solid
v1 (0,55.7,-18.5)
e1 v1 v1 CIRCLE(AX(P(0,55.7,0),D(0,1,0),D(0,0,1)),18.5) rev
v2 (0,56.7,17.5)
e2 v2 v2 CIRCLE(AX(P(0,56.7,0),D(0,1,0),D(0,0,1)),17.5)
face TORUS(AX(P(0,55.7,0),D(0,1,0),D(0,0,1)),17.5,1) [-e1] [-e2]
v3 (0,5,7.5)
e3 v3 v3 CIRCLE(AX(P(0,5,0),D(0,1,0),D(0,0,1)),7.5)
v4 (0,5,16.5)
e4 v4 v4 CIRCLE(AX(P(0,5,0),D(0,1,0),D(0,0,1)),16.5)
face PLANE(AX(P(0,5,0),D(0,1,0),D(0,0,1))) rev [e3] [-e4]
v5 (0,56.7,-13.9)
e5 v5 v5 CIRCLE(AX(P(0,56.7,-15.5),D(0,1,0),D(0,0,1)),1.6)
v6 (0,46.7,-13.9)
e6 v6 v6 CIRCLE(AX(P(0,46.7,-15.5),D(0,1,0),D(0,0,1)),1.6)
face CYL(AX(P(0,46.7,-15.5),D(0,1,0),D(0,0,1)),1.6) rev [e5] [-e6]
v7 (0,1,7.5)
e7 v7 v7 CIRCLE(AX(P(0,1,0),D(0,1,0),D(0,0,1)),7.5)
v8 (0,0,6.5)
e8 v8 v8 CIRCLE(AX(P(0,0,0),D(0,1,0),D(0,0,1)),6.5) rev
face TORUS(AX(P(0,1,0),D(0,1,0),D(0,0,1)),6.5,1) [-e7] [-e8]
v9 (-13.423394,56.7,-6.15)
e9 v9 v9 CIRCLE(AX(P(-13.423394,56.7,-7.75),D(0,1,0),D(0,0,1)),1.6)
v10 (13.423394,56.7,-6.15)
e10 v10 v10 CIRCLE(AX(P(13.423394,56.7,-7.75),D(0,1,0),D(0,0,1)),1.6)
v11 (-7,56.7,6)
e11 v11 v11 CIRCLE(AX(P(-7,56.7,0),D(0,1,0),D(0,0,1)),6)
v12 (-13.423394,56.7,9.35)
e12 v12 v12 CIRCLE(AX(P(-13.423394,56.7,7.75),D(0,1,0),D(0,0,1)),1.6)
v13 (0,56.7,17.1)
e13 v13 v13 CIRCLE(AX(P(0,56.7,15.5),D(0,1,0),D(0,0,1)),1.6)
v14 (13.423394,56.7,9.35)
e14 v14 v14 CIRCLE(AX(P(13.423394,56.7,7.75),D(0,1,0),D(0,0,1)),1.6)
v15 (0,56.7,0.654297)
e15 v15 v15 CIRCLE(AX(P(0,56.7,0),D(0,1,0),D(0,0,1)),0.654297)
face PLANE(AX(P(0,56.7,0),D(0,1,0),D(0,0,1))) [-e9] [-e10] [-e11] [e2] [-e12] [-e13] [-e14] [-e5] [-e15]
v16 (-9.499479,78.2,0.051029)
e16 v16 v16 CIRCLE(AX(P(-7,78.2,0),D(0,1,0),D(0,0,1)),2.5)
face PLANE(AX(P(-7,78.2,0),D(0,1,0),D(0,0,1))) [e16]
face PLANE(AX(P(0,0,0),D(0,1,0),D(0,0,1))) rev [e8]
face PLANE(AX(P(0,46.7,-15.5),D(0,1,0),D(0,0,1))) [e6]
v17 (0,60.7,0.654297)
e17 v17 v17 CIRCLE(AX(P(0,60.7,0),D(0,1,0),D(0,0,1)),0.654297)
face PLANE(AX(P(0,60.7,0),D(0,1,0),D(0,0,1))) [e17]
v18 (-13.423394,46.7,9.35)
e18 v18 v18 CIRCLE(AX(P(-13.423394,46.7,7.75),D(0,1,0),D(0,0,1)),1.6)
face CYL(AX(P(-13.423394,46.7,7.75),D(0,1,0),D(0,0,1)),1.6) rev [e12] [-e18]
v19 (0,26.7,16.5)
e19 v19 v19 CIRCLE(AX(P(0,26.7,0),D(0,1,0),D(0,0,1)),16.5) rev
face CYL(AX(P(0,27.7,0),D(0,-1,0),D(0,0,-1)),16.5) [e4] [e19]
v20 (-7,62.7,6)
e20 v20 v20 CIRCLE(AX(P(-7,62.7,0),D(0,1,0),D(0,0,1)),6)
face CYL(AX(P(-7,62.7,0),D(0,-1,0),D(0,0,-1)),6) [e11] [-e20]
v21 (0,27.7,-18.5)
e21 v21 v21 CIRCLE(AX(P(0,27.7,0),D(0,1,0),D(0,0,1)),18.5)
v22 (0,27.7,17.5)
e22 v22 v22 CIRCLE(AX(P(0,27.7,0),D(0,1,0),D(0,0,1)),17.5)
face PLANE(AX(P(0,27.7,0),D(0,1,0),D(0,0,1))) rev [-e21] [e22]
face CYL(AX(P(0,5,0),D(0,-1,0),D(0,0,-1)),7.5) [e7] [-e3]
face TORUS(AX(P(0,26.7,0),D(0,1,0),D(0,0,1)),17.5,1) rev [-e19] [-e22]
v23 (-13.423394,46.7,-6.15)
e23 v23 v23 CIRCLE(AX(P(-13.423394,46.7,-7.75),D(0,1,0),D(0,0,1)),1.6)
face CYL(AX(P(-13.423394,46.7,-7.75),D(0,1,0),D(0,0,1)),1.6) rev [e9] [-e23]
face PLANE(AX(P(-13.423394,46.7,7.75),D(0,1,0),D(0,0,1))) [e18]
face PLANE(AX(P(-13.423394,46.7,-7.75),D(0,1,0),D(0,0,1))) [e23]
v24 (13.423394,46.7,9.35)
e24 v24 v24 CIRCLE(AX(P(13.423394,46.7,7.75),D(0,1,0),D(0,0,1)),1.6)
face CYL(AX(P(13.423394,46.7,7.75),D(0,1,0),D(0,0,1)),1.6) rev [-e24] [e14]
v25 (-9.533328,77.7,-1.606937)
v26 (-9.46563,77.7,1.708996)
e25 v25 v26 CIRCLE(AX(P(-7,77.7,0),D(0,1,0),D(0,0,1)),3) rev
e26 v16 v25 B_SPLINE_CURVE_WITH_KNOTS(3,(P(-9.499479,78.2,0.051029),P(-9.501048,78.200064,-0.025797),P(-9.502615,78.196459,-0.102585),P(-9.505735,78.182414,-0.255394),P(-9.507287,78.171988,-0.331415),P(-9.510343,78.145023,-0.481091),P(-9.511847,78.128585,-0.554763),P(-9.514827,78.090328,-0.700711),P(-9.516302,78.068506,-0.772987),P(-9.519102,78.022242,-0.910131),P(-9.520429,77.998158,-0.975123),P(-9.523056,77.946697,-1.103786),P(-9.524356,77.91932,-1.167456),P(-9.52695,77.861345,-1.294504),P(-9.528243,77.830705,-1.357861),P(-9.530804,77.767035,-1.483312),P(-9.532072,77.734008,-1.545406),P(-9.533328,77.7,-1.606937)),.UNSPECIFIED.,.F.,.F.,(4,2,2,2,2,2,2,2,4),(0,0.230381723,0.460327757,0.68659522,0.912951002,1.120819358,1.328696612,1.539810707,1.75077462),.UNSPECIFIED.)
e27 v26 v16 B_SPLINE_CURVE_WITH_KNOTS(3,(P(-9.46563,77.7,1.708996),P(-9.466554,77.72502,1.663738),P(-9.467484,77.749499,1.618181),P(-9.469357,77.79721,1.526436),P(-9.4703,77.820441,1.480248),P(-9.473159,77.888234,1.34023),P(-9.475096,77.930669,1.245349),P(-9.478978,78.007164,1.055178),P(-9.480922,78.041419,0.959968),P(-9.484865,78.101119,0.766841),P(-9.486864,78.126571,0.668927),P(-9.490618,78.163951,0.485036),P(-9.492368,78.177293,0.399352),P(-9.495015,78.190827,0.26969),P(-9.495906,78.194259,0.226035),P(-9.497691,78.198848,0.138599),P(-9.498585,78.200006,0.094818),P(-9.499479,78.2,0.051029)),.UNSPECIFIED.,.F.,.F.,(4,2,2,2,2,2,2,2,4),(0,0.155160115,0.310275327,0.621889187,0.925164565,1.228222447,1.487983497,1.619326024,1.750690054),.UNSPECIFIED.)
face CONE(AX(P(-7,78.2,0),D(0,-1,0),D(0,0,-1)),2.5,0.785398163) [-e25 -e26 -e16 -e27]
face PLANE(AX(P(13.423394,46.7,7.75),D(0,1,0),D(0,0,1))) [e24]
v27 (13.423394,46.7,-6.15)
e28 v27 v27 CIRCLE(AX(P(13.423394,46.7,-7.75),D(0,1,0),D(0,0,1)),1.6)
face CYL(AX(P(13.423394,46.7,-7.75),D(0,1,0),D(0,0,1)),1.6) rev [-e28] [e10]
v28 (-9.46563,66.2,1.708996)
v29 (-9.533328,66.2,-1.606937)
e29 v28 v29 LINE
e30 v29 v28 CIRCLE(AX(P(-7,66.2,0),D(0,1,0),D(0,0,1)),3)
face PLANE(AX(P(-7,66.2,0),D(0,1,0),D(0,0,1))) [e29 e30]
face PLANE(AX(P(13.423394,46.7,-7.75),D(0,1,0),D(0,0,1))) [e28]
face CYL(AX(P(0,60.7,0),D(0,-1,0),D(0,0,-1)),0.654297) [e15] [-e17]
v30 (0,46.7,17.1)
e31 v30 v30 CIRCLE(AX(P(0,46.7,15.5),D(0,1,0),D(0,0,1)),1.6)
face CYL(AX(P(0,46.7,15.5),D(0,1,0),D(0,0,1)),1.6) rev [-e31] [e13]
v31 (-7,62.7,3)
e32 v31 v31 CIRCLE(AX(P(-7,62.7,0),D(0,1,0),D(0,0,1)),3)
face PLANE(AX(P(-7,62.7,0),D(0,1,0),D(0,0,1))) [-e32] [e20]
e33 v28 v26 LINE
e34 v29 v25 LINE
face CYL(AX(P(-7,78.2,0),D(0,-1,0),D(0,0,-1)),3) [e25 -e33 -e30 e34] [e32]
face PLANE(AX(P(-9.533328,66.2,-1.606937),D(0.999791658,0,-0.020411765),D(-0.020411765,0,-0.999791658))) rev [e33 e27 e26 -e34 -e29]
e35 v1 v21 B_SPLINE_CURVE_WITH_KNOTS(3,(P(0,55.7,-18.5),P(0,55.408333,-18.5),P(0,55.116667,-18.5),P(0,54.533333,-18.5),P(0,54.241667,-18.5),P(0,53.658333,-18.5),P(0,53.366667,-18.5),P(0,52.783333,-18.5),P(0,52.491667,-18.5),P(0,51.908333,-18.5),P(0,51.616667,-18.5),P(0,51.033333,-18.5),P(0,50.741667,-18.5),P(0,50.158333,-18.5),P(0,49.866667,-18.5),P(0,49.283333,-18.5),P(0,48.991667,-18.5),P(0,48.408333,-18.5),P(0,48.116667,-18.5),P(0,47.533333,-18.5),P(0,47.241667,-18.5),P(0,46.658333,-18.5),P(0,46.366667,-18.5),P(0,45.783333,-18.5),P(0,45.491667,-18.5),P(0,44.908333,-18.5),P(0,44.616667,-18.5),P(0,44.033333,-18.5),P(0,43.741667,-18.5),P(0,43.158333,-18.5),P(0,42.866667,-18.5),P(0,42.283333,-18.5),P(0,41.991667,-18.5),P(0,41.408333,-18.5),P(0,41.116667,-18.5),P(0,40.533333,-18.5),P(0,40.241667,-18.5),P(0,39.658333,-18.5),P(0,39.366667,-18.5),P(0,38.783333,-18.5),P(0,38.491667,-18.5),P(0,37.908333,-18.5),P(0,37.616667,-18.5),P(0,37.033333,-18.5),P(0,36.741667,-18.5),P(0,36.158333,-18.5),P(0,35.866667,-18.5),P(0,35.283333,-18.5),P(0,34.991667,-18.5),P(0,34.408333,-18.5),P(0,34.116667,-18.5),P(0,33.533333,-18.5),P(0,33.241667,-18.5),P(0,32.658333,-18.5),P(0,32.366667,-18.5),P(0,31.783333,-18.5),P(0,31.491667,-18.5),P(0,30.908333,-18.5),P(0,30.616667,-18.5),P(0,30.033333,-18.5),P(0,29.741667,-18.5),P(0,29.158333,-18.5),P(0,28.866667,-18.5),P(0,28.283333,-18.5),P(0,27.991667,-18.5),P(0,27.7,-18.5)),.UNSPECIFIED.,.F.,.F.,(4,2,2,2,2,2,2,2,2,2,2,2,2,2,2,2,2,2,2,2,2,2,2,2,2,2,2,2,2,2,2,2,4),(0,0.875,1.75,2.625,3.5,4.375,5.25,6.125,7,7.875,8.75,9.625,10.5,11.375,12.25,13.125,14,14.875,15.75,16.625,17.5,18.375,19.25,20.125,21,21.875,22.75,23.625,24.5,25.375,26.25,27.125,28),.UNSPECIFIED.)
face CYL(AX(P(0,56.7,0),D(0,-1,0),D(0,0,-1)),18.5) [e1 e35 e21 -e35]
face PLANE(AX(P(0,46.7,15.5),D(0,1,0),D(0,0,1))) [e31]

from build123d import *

# Parameters (mm, degrees)
SKETCH_1_R          = 7.5
EXTRUDE_1_DEPTH     = 5
SKETCH_2_R          = 16.5
EXTRUDE_2_DEPTH     = 22.7
SKETCH_3_R          = 18.5
EXTRUDE_3_DEPTH     = 29
SKETCH_4_R          = 1.6
CUT_EXTRUDE_1_DEPTH = 10
SKETCH_5_R          = 6
EXTRUDE_4_DEPTH     = 6
SKETCH_6_R          = 3
EXTRUDE_5_DEPTH     = 15.5
CUT_EXTRUDE_START   = -12
CUT_EXTRUDE_2_DEPTH = 12
CHAMFER_1_SIZE      = 0.5
FILLET_1_R          = 1
FILLET_2_R          = 1
FILLET_3_R          = 1
SKETCH_8_R          = 0.654296706
EXTRUDE_6_DEPTH     = 4


with BuildPart() as part:
    # Эскиз1 → Бобышка-Вытянуть1 (new body)
    with BuildSketch(Plane(origin=(0, 0, 0), x_dir=(1, 0, 0), z_dir=(0, 1, 0))):
        with Locations(Location((0, 0, 0), (0, 0, 270))):
            Circle(SKETCH_1_R)
    extrude(amount=EXTRUDE_1_DEPTH)

    # Эскиз2 → Бобышка-Вытянуть2 (add)
    with BuildSketch(Plane(origin=(0, 5, 0), x_dir=(1, 0, 0), z_dir=(0, 1, 0))):
        with Locations(Location((0, 0, 0), (0, 0, 270))):
            Circle(SKETCH_2_R)
    extrude(amount=EXTRUDE_2_DEPTH)

    # Эскиз3 → Бобышка-Вытянуть3 (add)
    with BuildSketch(Plane(origin=(0, 27.7, 0), x_dir=(1, 0, 0), z_dir=(0, 1, 0))):
        with Locations(Location((0, 0, 0), (0, 0, 90))):
            Circle(SKETCH_3_R)
    extrude(amount=EXTRUDE_3_DEPTH)

    # Эскиз4 → Вырез-Вытянуть1 (cut)
    with BuildSketch(Plane(origin=(0, 56.7, 0), x_dir=(1, 0, 0), z_dir=(0, 1, 0))):
        with Locations(Location((0, -15.5, 0), (0, 0, 270))):
            Circle(SKETCH_4_R)
        with Locations(Location((-13.423393759, -7.75, 0), (0, 0, 270))):
            Circle(SKETCH_4_R)
        with Locations(Location((-13.423393759, 7.75, 0), (0, 0, 270))):
            Circle(SKETCH_4_R)
        with Locations(Location((0, 15.5, 0), (0, 0, 270))):
            Circle(SKETCH_4_R)
        with Locations(Location((13.423393759, 7.75, 0), (0, 0, 270))):
            Circle(SKETCH_4_R)
        with Locations(Location((13.423393759, -7.75, 0), (0, 0, 270))):
            Circle(SKETCH_4_R)
    extrude(amount=-CUT_EXTRUDE_1_DEPTH, mode=Mode.SUBTRACT)

    # Эскиз5 → Бобышка-Вытянуть4 (add)
    with BuildSketch(Plane(origin=(0, 56.7, 0), x_dir=(1, 0, 0), z_dir=(0, 1, 0))):
        with Locations(Location((-7, 0, 0), (0, 0, 270))):
            Circle(SKETCH_5_R)
    extrude(amount=EXTRUDE_4_DEPTH)

    # Эскиз6 → Бобышка-Вытянуть5 (add)
    with BuildSketch(Plane(origin=(0, 62.7, 0), x_dir=(1, 0, 0), z_dir=(0, 1, 0))):
        with Locations(Location((-7, 0, 0), (0, 0, 270))):
            Circle(SKETCH_6_R)
    extrude(amount=EXTRUDE_5_DEPTH)

    # Эскиз7 → Вырез-Вытянуть2 (cut)
    with BuildSketch(Plane(origin=(0, 78.2, 0), x_dir=(1, 0, 0), z_dir=(0, 1, 0)).offset(CUT_EXTRUDE_START)):
        with BuildLine():
            Line((-9.533328229, 1.606937486), (-9.465630062, -1.708996312))
            ThreePointArc((-9.465630062, -1.708996312), (-9.999374975, -0.061235296), (-9.533328229, 1.606937486))
        make_face()
    extrude(amount=CUT_EXTRUDE_2_DEPTH, mode=Mode.SUBTRACT)

    # Фаска1
    chamfer_1_edges = [part.edges().sort_by_distance(p)[0] for p in [
        (-4.371234847, 78.2, -1.445542725),
    ]]
    chamfer(chamfer_1_edges, length=CHAMFER_1_SIZE - 0.0001)  # a hair under: the kernel refuses the full size

    # Скругление1
    fillet_1_edges = [part.edges().sort_by_distance(p)[0] for p in [
        (0, 56.7, 18.5),
    ]]
    fillet(fillet_1_edges, radius=FILLET_1_R)

    # Скругление2
    fillet_2_edges = [part.edges().sort_by_distance(p)[0] for p in [
        (0, 27.7, -16.5),
    ]]
    fillet(fillet_2_edges, radius=FILLET_2_R)

    # Скругление3
    fillet_3_edges = [part.edges().sort_by_distance(p)[0] for p in [
        (0, 0, -7.5),
    ]]
    fillet(fillet_3_edges, radius=FILLET_3_R)

    # Эскиз8 → Бобышка-Вытянуть6 (add)
    with BuildSketch(Plane(origin=(0, 56.7, 0), x_dir=(1, 0, 0), z_dir=(0, 1, 0))):
        with Locations(Location((0, 0, 0), (0, 0, 270))):
            Circle(SKETCH_8_R)
    extrude(amount=EXTRUDE_6_DEPTH)


solid = part.part
